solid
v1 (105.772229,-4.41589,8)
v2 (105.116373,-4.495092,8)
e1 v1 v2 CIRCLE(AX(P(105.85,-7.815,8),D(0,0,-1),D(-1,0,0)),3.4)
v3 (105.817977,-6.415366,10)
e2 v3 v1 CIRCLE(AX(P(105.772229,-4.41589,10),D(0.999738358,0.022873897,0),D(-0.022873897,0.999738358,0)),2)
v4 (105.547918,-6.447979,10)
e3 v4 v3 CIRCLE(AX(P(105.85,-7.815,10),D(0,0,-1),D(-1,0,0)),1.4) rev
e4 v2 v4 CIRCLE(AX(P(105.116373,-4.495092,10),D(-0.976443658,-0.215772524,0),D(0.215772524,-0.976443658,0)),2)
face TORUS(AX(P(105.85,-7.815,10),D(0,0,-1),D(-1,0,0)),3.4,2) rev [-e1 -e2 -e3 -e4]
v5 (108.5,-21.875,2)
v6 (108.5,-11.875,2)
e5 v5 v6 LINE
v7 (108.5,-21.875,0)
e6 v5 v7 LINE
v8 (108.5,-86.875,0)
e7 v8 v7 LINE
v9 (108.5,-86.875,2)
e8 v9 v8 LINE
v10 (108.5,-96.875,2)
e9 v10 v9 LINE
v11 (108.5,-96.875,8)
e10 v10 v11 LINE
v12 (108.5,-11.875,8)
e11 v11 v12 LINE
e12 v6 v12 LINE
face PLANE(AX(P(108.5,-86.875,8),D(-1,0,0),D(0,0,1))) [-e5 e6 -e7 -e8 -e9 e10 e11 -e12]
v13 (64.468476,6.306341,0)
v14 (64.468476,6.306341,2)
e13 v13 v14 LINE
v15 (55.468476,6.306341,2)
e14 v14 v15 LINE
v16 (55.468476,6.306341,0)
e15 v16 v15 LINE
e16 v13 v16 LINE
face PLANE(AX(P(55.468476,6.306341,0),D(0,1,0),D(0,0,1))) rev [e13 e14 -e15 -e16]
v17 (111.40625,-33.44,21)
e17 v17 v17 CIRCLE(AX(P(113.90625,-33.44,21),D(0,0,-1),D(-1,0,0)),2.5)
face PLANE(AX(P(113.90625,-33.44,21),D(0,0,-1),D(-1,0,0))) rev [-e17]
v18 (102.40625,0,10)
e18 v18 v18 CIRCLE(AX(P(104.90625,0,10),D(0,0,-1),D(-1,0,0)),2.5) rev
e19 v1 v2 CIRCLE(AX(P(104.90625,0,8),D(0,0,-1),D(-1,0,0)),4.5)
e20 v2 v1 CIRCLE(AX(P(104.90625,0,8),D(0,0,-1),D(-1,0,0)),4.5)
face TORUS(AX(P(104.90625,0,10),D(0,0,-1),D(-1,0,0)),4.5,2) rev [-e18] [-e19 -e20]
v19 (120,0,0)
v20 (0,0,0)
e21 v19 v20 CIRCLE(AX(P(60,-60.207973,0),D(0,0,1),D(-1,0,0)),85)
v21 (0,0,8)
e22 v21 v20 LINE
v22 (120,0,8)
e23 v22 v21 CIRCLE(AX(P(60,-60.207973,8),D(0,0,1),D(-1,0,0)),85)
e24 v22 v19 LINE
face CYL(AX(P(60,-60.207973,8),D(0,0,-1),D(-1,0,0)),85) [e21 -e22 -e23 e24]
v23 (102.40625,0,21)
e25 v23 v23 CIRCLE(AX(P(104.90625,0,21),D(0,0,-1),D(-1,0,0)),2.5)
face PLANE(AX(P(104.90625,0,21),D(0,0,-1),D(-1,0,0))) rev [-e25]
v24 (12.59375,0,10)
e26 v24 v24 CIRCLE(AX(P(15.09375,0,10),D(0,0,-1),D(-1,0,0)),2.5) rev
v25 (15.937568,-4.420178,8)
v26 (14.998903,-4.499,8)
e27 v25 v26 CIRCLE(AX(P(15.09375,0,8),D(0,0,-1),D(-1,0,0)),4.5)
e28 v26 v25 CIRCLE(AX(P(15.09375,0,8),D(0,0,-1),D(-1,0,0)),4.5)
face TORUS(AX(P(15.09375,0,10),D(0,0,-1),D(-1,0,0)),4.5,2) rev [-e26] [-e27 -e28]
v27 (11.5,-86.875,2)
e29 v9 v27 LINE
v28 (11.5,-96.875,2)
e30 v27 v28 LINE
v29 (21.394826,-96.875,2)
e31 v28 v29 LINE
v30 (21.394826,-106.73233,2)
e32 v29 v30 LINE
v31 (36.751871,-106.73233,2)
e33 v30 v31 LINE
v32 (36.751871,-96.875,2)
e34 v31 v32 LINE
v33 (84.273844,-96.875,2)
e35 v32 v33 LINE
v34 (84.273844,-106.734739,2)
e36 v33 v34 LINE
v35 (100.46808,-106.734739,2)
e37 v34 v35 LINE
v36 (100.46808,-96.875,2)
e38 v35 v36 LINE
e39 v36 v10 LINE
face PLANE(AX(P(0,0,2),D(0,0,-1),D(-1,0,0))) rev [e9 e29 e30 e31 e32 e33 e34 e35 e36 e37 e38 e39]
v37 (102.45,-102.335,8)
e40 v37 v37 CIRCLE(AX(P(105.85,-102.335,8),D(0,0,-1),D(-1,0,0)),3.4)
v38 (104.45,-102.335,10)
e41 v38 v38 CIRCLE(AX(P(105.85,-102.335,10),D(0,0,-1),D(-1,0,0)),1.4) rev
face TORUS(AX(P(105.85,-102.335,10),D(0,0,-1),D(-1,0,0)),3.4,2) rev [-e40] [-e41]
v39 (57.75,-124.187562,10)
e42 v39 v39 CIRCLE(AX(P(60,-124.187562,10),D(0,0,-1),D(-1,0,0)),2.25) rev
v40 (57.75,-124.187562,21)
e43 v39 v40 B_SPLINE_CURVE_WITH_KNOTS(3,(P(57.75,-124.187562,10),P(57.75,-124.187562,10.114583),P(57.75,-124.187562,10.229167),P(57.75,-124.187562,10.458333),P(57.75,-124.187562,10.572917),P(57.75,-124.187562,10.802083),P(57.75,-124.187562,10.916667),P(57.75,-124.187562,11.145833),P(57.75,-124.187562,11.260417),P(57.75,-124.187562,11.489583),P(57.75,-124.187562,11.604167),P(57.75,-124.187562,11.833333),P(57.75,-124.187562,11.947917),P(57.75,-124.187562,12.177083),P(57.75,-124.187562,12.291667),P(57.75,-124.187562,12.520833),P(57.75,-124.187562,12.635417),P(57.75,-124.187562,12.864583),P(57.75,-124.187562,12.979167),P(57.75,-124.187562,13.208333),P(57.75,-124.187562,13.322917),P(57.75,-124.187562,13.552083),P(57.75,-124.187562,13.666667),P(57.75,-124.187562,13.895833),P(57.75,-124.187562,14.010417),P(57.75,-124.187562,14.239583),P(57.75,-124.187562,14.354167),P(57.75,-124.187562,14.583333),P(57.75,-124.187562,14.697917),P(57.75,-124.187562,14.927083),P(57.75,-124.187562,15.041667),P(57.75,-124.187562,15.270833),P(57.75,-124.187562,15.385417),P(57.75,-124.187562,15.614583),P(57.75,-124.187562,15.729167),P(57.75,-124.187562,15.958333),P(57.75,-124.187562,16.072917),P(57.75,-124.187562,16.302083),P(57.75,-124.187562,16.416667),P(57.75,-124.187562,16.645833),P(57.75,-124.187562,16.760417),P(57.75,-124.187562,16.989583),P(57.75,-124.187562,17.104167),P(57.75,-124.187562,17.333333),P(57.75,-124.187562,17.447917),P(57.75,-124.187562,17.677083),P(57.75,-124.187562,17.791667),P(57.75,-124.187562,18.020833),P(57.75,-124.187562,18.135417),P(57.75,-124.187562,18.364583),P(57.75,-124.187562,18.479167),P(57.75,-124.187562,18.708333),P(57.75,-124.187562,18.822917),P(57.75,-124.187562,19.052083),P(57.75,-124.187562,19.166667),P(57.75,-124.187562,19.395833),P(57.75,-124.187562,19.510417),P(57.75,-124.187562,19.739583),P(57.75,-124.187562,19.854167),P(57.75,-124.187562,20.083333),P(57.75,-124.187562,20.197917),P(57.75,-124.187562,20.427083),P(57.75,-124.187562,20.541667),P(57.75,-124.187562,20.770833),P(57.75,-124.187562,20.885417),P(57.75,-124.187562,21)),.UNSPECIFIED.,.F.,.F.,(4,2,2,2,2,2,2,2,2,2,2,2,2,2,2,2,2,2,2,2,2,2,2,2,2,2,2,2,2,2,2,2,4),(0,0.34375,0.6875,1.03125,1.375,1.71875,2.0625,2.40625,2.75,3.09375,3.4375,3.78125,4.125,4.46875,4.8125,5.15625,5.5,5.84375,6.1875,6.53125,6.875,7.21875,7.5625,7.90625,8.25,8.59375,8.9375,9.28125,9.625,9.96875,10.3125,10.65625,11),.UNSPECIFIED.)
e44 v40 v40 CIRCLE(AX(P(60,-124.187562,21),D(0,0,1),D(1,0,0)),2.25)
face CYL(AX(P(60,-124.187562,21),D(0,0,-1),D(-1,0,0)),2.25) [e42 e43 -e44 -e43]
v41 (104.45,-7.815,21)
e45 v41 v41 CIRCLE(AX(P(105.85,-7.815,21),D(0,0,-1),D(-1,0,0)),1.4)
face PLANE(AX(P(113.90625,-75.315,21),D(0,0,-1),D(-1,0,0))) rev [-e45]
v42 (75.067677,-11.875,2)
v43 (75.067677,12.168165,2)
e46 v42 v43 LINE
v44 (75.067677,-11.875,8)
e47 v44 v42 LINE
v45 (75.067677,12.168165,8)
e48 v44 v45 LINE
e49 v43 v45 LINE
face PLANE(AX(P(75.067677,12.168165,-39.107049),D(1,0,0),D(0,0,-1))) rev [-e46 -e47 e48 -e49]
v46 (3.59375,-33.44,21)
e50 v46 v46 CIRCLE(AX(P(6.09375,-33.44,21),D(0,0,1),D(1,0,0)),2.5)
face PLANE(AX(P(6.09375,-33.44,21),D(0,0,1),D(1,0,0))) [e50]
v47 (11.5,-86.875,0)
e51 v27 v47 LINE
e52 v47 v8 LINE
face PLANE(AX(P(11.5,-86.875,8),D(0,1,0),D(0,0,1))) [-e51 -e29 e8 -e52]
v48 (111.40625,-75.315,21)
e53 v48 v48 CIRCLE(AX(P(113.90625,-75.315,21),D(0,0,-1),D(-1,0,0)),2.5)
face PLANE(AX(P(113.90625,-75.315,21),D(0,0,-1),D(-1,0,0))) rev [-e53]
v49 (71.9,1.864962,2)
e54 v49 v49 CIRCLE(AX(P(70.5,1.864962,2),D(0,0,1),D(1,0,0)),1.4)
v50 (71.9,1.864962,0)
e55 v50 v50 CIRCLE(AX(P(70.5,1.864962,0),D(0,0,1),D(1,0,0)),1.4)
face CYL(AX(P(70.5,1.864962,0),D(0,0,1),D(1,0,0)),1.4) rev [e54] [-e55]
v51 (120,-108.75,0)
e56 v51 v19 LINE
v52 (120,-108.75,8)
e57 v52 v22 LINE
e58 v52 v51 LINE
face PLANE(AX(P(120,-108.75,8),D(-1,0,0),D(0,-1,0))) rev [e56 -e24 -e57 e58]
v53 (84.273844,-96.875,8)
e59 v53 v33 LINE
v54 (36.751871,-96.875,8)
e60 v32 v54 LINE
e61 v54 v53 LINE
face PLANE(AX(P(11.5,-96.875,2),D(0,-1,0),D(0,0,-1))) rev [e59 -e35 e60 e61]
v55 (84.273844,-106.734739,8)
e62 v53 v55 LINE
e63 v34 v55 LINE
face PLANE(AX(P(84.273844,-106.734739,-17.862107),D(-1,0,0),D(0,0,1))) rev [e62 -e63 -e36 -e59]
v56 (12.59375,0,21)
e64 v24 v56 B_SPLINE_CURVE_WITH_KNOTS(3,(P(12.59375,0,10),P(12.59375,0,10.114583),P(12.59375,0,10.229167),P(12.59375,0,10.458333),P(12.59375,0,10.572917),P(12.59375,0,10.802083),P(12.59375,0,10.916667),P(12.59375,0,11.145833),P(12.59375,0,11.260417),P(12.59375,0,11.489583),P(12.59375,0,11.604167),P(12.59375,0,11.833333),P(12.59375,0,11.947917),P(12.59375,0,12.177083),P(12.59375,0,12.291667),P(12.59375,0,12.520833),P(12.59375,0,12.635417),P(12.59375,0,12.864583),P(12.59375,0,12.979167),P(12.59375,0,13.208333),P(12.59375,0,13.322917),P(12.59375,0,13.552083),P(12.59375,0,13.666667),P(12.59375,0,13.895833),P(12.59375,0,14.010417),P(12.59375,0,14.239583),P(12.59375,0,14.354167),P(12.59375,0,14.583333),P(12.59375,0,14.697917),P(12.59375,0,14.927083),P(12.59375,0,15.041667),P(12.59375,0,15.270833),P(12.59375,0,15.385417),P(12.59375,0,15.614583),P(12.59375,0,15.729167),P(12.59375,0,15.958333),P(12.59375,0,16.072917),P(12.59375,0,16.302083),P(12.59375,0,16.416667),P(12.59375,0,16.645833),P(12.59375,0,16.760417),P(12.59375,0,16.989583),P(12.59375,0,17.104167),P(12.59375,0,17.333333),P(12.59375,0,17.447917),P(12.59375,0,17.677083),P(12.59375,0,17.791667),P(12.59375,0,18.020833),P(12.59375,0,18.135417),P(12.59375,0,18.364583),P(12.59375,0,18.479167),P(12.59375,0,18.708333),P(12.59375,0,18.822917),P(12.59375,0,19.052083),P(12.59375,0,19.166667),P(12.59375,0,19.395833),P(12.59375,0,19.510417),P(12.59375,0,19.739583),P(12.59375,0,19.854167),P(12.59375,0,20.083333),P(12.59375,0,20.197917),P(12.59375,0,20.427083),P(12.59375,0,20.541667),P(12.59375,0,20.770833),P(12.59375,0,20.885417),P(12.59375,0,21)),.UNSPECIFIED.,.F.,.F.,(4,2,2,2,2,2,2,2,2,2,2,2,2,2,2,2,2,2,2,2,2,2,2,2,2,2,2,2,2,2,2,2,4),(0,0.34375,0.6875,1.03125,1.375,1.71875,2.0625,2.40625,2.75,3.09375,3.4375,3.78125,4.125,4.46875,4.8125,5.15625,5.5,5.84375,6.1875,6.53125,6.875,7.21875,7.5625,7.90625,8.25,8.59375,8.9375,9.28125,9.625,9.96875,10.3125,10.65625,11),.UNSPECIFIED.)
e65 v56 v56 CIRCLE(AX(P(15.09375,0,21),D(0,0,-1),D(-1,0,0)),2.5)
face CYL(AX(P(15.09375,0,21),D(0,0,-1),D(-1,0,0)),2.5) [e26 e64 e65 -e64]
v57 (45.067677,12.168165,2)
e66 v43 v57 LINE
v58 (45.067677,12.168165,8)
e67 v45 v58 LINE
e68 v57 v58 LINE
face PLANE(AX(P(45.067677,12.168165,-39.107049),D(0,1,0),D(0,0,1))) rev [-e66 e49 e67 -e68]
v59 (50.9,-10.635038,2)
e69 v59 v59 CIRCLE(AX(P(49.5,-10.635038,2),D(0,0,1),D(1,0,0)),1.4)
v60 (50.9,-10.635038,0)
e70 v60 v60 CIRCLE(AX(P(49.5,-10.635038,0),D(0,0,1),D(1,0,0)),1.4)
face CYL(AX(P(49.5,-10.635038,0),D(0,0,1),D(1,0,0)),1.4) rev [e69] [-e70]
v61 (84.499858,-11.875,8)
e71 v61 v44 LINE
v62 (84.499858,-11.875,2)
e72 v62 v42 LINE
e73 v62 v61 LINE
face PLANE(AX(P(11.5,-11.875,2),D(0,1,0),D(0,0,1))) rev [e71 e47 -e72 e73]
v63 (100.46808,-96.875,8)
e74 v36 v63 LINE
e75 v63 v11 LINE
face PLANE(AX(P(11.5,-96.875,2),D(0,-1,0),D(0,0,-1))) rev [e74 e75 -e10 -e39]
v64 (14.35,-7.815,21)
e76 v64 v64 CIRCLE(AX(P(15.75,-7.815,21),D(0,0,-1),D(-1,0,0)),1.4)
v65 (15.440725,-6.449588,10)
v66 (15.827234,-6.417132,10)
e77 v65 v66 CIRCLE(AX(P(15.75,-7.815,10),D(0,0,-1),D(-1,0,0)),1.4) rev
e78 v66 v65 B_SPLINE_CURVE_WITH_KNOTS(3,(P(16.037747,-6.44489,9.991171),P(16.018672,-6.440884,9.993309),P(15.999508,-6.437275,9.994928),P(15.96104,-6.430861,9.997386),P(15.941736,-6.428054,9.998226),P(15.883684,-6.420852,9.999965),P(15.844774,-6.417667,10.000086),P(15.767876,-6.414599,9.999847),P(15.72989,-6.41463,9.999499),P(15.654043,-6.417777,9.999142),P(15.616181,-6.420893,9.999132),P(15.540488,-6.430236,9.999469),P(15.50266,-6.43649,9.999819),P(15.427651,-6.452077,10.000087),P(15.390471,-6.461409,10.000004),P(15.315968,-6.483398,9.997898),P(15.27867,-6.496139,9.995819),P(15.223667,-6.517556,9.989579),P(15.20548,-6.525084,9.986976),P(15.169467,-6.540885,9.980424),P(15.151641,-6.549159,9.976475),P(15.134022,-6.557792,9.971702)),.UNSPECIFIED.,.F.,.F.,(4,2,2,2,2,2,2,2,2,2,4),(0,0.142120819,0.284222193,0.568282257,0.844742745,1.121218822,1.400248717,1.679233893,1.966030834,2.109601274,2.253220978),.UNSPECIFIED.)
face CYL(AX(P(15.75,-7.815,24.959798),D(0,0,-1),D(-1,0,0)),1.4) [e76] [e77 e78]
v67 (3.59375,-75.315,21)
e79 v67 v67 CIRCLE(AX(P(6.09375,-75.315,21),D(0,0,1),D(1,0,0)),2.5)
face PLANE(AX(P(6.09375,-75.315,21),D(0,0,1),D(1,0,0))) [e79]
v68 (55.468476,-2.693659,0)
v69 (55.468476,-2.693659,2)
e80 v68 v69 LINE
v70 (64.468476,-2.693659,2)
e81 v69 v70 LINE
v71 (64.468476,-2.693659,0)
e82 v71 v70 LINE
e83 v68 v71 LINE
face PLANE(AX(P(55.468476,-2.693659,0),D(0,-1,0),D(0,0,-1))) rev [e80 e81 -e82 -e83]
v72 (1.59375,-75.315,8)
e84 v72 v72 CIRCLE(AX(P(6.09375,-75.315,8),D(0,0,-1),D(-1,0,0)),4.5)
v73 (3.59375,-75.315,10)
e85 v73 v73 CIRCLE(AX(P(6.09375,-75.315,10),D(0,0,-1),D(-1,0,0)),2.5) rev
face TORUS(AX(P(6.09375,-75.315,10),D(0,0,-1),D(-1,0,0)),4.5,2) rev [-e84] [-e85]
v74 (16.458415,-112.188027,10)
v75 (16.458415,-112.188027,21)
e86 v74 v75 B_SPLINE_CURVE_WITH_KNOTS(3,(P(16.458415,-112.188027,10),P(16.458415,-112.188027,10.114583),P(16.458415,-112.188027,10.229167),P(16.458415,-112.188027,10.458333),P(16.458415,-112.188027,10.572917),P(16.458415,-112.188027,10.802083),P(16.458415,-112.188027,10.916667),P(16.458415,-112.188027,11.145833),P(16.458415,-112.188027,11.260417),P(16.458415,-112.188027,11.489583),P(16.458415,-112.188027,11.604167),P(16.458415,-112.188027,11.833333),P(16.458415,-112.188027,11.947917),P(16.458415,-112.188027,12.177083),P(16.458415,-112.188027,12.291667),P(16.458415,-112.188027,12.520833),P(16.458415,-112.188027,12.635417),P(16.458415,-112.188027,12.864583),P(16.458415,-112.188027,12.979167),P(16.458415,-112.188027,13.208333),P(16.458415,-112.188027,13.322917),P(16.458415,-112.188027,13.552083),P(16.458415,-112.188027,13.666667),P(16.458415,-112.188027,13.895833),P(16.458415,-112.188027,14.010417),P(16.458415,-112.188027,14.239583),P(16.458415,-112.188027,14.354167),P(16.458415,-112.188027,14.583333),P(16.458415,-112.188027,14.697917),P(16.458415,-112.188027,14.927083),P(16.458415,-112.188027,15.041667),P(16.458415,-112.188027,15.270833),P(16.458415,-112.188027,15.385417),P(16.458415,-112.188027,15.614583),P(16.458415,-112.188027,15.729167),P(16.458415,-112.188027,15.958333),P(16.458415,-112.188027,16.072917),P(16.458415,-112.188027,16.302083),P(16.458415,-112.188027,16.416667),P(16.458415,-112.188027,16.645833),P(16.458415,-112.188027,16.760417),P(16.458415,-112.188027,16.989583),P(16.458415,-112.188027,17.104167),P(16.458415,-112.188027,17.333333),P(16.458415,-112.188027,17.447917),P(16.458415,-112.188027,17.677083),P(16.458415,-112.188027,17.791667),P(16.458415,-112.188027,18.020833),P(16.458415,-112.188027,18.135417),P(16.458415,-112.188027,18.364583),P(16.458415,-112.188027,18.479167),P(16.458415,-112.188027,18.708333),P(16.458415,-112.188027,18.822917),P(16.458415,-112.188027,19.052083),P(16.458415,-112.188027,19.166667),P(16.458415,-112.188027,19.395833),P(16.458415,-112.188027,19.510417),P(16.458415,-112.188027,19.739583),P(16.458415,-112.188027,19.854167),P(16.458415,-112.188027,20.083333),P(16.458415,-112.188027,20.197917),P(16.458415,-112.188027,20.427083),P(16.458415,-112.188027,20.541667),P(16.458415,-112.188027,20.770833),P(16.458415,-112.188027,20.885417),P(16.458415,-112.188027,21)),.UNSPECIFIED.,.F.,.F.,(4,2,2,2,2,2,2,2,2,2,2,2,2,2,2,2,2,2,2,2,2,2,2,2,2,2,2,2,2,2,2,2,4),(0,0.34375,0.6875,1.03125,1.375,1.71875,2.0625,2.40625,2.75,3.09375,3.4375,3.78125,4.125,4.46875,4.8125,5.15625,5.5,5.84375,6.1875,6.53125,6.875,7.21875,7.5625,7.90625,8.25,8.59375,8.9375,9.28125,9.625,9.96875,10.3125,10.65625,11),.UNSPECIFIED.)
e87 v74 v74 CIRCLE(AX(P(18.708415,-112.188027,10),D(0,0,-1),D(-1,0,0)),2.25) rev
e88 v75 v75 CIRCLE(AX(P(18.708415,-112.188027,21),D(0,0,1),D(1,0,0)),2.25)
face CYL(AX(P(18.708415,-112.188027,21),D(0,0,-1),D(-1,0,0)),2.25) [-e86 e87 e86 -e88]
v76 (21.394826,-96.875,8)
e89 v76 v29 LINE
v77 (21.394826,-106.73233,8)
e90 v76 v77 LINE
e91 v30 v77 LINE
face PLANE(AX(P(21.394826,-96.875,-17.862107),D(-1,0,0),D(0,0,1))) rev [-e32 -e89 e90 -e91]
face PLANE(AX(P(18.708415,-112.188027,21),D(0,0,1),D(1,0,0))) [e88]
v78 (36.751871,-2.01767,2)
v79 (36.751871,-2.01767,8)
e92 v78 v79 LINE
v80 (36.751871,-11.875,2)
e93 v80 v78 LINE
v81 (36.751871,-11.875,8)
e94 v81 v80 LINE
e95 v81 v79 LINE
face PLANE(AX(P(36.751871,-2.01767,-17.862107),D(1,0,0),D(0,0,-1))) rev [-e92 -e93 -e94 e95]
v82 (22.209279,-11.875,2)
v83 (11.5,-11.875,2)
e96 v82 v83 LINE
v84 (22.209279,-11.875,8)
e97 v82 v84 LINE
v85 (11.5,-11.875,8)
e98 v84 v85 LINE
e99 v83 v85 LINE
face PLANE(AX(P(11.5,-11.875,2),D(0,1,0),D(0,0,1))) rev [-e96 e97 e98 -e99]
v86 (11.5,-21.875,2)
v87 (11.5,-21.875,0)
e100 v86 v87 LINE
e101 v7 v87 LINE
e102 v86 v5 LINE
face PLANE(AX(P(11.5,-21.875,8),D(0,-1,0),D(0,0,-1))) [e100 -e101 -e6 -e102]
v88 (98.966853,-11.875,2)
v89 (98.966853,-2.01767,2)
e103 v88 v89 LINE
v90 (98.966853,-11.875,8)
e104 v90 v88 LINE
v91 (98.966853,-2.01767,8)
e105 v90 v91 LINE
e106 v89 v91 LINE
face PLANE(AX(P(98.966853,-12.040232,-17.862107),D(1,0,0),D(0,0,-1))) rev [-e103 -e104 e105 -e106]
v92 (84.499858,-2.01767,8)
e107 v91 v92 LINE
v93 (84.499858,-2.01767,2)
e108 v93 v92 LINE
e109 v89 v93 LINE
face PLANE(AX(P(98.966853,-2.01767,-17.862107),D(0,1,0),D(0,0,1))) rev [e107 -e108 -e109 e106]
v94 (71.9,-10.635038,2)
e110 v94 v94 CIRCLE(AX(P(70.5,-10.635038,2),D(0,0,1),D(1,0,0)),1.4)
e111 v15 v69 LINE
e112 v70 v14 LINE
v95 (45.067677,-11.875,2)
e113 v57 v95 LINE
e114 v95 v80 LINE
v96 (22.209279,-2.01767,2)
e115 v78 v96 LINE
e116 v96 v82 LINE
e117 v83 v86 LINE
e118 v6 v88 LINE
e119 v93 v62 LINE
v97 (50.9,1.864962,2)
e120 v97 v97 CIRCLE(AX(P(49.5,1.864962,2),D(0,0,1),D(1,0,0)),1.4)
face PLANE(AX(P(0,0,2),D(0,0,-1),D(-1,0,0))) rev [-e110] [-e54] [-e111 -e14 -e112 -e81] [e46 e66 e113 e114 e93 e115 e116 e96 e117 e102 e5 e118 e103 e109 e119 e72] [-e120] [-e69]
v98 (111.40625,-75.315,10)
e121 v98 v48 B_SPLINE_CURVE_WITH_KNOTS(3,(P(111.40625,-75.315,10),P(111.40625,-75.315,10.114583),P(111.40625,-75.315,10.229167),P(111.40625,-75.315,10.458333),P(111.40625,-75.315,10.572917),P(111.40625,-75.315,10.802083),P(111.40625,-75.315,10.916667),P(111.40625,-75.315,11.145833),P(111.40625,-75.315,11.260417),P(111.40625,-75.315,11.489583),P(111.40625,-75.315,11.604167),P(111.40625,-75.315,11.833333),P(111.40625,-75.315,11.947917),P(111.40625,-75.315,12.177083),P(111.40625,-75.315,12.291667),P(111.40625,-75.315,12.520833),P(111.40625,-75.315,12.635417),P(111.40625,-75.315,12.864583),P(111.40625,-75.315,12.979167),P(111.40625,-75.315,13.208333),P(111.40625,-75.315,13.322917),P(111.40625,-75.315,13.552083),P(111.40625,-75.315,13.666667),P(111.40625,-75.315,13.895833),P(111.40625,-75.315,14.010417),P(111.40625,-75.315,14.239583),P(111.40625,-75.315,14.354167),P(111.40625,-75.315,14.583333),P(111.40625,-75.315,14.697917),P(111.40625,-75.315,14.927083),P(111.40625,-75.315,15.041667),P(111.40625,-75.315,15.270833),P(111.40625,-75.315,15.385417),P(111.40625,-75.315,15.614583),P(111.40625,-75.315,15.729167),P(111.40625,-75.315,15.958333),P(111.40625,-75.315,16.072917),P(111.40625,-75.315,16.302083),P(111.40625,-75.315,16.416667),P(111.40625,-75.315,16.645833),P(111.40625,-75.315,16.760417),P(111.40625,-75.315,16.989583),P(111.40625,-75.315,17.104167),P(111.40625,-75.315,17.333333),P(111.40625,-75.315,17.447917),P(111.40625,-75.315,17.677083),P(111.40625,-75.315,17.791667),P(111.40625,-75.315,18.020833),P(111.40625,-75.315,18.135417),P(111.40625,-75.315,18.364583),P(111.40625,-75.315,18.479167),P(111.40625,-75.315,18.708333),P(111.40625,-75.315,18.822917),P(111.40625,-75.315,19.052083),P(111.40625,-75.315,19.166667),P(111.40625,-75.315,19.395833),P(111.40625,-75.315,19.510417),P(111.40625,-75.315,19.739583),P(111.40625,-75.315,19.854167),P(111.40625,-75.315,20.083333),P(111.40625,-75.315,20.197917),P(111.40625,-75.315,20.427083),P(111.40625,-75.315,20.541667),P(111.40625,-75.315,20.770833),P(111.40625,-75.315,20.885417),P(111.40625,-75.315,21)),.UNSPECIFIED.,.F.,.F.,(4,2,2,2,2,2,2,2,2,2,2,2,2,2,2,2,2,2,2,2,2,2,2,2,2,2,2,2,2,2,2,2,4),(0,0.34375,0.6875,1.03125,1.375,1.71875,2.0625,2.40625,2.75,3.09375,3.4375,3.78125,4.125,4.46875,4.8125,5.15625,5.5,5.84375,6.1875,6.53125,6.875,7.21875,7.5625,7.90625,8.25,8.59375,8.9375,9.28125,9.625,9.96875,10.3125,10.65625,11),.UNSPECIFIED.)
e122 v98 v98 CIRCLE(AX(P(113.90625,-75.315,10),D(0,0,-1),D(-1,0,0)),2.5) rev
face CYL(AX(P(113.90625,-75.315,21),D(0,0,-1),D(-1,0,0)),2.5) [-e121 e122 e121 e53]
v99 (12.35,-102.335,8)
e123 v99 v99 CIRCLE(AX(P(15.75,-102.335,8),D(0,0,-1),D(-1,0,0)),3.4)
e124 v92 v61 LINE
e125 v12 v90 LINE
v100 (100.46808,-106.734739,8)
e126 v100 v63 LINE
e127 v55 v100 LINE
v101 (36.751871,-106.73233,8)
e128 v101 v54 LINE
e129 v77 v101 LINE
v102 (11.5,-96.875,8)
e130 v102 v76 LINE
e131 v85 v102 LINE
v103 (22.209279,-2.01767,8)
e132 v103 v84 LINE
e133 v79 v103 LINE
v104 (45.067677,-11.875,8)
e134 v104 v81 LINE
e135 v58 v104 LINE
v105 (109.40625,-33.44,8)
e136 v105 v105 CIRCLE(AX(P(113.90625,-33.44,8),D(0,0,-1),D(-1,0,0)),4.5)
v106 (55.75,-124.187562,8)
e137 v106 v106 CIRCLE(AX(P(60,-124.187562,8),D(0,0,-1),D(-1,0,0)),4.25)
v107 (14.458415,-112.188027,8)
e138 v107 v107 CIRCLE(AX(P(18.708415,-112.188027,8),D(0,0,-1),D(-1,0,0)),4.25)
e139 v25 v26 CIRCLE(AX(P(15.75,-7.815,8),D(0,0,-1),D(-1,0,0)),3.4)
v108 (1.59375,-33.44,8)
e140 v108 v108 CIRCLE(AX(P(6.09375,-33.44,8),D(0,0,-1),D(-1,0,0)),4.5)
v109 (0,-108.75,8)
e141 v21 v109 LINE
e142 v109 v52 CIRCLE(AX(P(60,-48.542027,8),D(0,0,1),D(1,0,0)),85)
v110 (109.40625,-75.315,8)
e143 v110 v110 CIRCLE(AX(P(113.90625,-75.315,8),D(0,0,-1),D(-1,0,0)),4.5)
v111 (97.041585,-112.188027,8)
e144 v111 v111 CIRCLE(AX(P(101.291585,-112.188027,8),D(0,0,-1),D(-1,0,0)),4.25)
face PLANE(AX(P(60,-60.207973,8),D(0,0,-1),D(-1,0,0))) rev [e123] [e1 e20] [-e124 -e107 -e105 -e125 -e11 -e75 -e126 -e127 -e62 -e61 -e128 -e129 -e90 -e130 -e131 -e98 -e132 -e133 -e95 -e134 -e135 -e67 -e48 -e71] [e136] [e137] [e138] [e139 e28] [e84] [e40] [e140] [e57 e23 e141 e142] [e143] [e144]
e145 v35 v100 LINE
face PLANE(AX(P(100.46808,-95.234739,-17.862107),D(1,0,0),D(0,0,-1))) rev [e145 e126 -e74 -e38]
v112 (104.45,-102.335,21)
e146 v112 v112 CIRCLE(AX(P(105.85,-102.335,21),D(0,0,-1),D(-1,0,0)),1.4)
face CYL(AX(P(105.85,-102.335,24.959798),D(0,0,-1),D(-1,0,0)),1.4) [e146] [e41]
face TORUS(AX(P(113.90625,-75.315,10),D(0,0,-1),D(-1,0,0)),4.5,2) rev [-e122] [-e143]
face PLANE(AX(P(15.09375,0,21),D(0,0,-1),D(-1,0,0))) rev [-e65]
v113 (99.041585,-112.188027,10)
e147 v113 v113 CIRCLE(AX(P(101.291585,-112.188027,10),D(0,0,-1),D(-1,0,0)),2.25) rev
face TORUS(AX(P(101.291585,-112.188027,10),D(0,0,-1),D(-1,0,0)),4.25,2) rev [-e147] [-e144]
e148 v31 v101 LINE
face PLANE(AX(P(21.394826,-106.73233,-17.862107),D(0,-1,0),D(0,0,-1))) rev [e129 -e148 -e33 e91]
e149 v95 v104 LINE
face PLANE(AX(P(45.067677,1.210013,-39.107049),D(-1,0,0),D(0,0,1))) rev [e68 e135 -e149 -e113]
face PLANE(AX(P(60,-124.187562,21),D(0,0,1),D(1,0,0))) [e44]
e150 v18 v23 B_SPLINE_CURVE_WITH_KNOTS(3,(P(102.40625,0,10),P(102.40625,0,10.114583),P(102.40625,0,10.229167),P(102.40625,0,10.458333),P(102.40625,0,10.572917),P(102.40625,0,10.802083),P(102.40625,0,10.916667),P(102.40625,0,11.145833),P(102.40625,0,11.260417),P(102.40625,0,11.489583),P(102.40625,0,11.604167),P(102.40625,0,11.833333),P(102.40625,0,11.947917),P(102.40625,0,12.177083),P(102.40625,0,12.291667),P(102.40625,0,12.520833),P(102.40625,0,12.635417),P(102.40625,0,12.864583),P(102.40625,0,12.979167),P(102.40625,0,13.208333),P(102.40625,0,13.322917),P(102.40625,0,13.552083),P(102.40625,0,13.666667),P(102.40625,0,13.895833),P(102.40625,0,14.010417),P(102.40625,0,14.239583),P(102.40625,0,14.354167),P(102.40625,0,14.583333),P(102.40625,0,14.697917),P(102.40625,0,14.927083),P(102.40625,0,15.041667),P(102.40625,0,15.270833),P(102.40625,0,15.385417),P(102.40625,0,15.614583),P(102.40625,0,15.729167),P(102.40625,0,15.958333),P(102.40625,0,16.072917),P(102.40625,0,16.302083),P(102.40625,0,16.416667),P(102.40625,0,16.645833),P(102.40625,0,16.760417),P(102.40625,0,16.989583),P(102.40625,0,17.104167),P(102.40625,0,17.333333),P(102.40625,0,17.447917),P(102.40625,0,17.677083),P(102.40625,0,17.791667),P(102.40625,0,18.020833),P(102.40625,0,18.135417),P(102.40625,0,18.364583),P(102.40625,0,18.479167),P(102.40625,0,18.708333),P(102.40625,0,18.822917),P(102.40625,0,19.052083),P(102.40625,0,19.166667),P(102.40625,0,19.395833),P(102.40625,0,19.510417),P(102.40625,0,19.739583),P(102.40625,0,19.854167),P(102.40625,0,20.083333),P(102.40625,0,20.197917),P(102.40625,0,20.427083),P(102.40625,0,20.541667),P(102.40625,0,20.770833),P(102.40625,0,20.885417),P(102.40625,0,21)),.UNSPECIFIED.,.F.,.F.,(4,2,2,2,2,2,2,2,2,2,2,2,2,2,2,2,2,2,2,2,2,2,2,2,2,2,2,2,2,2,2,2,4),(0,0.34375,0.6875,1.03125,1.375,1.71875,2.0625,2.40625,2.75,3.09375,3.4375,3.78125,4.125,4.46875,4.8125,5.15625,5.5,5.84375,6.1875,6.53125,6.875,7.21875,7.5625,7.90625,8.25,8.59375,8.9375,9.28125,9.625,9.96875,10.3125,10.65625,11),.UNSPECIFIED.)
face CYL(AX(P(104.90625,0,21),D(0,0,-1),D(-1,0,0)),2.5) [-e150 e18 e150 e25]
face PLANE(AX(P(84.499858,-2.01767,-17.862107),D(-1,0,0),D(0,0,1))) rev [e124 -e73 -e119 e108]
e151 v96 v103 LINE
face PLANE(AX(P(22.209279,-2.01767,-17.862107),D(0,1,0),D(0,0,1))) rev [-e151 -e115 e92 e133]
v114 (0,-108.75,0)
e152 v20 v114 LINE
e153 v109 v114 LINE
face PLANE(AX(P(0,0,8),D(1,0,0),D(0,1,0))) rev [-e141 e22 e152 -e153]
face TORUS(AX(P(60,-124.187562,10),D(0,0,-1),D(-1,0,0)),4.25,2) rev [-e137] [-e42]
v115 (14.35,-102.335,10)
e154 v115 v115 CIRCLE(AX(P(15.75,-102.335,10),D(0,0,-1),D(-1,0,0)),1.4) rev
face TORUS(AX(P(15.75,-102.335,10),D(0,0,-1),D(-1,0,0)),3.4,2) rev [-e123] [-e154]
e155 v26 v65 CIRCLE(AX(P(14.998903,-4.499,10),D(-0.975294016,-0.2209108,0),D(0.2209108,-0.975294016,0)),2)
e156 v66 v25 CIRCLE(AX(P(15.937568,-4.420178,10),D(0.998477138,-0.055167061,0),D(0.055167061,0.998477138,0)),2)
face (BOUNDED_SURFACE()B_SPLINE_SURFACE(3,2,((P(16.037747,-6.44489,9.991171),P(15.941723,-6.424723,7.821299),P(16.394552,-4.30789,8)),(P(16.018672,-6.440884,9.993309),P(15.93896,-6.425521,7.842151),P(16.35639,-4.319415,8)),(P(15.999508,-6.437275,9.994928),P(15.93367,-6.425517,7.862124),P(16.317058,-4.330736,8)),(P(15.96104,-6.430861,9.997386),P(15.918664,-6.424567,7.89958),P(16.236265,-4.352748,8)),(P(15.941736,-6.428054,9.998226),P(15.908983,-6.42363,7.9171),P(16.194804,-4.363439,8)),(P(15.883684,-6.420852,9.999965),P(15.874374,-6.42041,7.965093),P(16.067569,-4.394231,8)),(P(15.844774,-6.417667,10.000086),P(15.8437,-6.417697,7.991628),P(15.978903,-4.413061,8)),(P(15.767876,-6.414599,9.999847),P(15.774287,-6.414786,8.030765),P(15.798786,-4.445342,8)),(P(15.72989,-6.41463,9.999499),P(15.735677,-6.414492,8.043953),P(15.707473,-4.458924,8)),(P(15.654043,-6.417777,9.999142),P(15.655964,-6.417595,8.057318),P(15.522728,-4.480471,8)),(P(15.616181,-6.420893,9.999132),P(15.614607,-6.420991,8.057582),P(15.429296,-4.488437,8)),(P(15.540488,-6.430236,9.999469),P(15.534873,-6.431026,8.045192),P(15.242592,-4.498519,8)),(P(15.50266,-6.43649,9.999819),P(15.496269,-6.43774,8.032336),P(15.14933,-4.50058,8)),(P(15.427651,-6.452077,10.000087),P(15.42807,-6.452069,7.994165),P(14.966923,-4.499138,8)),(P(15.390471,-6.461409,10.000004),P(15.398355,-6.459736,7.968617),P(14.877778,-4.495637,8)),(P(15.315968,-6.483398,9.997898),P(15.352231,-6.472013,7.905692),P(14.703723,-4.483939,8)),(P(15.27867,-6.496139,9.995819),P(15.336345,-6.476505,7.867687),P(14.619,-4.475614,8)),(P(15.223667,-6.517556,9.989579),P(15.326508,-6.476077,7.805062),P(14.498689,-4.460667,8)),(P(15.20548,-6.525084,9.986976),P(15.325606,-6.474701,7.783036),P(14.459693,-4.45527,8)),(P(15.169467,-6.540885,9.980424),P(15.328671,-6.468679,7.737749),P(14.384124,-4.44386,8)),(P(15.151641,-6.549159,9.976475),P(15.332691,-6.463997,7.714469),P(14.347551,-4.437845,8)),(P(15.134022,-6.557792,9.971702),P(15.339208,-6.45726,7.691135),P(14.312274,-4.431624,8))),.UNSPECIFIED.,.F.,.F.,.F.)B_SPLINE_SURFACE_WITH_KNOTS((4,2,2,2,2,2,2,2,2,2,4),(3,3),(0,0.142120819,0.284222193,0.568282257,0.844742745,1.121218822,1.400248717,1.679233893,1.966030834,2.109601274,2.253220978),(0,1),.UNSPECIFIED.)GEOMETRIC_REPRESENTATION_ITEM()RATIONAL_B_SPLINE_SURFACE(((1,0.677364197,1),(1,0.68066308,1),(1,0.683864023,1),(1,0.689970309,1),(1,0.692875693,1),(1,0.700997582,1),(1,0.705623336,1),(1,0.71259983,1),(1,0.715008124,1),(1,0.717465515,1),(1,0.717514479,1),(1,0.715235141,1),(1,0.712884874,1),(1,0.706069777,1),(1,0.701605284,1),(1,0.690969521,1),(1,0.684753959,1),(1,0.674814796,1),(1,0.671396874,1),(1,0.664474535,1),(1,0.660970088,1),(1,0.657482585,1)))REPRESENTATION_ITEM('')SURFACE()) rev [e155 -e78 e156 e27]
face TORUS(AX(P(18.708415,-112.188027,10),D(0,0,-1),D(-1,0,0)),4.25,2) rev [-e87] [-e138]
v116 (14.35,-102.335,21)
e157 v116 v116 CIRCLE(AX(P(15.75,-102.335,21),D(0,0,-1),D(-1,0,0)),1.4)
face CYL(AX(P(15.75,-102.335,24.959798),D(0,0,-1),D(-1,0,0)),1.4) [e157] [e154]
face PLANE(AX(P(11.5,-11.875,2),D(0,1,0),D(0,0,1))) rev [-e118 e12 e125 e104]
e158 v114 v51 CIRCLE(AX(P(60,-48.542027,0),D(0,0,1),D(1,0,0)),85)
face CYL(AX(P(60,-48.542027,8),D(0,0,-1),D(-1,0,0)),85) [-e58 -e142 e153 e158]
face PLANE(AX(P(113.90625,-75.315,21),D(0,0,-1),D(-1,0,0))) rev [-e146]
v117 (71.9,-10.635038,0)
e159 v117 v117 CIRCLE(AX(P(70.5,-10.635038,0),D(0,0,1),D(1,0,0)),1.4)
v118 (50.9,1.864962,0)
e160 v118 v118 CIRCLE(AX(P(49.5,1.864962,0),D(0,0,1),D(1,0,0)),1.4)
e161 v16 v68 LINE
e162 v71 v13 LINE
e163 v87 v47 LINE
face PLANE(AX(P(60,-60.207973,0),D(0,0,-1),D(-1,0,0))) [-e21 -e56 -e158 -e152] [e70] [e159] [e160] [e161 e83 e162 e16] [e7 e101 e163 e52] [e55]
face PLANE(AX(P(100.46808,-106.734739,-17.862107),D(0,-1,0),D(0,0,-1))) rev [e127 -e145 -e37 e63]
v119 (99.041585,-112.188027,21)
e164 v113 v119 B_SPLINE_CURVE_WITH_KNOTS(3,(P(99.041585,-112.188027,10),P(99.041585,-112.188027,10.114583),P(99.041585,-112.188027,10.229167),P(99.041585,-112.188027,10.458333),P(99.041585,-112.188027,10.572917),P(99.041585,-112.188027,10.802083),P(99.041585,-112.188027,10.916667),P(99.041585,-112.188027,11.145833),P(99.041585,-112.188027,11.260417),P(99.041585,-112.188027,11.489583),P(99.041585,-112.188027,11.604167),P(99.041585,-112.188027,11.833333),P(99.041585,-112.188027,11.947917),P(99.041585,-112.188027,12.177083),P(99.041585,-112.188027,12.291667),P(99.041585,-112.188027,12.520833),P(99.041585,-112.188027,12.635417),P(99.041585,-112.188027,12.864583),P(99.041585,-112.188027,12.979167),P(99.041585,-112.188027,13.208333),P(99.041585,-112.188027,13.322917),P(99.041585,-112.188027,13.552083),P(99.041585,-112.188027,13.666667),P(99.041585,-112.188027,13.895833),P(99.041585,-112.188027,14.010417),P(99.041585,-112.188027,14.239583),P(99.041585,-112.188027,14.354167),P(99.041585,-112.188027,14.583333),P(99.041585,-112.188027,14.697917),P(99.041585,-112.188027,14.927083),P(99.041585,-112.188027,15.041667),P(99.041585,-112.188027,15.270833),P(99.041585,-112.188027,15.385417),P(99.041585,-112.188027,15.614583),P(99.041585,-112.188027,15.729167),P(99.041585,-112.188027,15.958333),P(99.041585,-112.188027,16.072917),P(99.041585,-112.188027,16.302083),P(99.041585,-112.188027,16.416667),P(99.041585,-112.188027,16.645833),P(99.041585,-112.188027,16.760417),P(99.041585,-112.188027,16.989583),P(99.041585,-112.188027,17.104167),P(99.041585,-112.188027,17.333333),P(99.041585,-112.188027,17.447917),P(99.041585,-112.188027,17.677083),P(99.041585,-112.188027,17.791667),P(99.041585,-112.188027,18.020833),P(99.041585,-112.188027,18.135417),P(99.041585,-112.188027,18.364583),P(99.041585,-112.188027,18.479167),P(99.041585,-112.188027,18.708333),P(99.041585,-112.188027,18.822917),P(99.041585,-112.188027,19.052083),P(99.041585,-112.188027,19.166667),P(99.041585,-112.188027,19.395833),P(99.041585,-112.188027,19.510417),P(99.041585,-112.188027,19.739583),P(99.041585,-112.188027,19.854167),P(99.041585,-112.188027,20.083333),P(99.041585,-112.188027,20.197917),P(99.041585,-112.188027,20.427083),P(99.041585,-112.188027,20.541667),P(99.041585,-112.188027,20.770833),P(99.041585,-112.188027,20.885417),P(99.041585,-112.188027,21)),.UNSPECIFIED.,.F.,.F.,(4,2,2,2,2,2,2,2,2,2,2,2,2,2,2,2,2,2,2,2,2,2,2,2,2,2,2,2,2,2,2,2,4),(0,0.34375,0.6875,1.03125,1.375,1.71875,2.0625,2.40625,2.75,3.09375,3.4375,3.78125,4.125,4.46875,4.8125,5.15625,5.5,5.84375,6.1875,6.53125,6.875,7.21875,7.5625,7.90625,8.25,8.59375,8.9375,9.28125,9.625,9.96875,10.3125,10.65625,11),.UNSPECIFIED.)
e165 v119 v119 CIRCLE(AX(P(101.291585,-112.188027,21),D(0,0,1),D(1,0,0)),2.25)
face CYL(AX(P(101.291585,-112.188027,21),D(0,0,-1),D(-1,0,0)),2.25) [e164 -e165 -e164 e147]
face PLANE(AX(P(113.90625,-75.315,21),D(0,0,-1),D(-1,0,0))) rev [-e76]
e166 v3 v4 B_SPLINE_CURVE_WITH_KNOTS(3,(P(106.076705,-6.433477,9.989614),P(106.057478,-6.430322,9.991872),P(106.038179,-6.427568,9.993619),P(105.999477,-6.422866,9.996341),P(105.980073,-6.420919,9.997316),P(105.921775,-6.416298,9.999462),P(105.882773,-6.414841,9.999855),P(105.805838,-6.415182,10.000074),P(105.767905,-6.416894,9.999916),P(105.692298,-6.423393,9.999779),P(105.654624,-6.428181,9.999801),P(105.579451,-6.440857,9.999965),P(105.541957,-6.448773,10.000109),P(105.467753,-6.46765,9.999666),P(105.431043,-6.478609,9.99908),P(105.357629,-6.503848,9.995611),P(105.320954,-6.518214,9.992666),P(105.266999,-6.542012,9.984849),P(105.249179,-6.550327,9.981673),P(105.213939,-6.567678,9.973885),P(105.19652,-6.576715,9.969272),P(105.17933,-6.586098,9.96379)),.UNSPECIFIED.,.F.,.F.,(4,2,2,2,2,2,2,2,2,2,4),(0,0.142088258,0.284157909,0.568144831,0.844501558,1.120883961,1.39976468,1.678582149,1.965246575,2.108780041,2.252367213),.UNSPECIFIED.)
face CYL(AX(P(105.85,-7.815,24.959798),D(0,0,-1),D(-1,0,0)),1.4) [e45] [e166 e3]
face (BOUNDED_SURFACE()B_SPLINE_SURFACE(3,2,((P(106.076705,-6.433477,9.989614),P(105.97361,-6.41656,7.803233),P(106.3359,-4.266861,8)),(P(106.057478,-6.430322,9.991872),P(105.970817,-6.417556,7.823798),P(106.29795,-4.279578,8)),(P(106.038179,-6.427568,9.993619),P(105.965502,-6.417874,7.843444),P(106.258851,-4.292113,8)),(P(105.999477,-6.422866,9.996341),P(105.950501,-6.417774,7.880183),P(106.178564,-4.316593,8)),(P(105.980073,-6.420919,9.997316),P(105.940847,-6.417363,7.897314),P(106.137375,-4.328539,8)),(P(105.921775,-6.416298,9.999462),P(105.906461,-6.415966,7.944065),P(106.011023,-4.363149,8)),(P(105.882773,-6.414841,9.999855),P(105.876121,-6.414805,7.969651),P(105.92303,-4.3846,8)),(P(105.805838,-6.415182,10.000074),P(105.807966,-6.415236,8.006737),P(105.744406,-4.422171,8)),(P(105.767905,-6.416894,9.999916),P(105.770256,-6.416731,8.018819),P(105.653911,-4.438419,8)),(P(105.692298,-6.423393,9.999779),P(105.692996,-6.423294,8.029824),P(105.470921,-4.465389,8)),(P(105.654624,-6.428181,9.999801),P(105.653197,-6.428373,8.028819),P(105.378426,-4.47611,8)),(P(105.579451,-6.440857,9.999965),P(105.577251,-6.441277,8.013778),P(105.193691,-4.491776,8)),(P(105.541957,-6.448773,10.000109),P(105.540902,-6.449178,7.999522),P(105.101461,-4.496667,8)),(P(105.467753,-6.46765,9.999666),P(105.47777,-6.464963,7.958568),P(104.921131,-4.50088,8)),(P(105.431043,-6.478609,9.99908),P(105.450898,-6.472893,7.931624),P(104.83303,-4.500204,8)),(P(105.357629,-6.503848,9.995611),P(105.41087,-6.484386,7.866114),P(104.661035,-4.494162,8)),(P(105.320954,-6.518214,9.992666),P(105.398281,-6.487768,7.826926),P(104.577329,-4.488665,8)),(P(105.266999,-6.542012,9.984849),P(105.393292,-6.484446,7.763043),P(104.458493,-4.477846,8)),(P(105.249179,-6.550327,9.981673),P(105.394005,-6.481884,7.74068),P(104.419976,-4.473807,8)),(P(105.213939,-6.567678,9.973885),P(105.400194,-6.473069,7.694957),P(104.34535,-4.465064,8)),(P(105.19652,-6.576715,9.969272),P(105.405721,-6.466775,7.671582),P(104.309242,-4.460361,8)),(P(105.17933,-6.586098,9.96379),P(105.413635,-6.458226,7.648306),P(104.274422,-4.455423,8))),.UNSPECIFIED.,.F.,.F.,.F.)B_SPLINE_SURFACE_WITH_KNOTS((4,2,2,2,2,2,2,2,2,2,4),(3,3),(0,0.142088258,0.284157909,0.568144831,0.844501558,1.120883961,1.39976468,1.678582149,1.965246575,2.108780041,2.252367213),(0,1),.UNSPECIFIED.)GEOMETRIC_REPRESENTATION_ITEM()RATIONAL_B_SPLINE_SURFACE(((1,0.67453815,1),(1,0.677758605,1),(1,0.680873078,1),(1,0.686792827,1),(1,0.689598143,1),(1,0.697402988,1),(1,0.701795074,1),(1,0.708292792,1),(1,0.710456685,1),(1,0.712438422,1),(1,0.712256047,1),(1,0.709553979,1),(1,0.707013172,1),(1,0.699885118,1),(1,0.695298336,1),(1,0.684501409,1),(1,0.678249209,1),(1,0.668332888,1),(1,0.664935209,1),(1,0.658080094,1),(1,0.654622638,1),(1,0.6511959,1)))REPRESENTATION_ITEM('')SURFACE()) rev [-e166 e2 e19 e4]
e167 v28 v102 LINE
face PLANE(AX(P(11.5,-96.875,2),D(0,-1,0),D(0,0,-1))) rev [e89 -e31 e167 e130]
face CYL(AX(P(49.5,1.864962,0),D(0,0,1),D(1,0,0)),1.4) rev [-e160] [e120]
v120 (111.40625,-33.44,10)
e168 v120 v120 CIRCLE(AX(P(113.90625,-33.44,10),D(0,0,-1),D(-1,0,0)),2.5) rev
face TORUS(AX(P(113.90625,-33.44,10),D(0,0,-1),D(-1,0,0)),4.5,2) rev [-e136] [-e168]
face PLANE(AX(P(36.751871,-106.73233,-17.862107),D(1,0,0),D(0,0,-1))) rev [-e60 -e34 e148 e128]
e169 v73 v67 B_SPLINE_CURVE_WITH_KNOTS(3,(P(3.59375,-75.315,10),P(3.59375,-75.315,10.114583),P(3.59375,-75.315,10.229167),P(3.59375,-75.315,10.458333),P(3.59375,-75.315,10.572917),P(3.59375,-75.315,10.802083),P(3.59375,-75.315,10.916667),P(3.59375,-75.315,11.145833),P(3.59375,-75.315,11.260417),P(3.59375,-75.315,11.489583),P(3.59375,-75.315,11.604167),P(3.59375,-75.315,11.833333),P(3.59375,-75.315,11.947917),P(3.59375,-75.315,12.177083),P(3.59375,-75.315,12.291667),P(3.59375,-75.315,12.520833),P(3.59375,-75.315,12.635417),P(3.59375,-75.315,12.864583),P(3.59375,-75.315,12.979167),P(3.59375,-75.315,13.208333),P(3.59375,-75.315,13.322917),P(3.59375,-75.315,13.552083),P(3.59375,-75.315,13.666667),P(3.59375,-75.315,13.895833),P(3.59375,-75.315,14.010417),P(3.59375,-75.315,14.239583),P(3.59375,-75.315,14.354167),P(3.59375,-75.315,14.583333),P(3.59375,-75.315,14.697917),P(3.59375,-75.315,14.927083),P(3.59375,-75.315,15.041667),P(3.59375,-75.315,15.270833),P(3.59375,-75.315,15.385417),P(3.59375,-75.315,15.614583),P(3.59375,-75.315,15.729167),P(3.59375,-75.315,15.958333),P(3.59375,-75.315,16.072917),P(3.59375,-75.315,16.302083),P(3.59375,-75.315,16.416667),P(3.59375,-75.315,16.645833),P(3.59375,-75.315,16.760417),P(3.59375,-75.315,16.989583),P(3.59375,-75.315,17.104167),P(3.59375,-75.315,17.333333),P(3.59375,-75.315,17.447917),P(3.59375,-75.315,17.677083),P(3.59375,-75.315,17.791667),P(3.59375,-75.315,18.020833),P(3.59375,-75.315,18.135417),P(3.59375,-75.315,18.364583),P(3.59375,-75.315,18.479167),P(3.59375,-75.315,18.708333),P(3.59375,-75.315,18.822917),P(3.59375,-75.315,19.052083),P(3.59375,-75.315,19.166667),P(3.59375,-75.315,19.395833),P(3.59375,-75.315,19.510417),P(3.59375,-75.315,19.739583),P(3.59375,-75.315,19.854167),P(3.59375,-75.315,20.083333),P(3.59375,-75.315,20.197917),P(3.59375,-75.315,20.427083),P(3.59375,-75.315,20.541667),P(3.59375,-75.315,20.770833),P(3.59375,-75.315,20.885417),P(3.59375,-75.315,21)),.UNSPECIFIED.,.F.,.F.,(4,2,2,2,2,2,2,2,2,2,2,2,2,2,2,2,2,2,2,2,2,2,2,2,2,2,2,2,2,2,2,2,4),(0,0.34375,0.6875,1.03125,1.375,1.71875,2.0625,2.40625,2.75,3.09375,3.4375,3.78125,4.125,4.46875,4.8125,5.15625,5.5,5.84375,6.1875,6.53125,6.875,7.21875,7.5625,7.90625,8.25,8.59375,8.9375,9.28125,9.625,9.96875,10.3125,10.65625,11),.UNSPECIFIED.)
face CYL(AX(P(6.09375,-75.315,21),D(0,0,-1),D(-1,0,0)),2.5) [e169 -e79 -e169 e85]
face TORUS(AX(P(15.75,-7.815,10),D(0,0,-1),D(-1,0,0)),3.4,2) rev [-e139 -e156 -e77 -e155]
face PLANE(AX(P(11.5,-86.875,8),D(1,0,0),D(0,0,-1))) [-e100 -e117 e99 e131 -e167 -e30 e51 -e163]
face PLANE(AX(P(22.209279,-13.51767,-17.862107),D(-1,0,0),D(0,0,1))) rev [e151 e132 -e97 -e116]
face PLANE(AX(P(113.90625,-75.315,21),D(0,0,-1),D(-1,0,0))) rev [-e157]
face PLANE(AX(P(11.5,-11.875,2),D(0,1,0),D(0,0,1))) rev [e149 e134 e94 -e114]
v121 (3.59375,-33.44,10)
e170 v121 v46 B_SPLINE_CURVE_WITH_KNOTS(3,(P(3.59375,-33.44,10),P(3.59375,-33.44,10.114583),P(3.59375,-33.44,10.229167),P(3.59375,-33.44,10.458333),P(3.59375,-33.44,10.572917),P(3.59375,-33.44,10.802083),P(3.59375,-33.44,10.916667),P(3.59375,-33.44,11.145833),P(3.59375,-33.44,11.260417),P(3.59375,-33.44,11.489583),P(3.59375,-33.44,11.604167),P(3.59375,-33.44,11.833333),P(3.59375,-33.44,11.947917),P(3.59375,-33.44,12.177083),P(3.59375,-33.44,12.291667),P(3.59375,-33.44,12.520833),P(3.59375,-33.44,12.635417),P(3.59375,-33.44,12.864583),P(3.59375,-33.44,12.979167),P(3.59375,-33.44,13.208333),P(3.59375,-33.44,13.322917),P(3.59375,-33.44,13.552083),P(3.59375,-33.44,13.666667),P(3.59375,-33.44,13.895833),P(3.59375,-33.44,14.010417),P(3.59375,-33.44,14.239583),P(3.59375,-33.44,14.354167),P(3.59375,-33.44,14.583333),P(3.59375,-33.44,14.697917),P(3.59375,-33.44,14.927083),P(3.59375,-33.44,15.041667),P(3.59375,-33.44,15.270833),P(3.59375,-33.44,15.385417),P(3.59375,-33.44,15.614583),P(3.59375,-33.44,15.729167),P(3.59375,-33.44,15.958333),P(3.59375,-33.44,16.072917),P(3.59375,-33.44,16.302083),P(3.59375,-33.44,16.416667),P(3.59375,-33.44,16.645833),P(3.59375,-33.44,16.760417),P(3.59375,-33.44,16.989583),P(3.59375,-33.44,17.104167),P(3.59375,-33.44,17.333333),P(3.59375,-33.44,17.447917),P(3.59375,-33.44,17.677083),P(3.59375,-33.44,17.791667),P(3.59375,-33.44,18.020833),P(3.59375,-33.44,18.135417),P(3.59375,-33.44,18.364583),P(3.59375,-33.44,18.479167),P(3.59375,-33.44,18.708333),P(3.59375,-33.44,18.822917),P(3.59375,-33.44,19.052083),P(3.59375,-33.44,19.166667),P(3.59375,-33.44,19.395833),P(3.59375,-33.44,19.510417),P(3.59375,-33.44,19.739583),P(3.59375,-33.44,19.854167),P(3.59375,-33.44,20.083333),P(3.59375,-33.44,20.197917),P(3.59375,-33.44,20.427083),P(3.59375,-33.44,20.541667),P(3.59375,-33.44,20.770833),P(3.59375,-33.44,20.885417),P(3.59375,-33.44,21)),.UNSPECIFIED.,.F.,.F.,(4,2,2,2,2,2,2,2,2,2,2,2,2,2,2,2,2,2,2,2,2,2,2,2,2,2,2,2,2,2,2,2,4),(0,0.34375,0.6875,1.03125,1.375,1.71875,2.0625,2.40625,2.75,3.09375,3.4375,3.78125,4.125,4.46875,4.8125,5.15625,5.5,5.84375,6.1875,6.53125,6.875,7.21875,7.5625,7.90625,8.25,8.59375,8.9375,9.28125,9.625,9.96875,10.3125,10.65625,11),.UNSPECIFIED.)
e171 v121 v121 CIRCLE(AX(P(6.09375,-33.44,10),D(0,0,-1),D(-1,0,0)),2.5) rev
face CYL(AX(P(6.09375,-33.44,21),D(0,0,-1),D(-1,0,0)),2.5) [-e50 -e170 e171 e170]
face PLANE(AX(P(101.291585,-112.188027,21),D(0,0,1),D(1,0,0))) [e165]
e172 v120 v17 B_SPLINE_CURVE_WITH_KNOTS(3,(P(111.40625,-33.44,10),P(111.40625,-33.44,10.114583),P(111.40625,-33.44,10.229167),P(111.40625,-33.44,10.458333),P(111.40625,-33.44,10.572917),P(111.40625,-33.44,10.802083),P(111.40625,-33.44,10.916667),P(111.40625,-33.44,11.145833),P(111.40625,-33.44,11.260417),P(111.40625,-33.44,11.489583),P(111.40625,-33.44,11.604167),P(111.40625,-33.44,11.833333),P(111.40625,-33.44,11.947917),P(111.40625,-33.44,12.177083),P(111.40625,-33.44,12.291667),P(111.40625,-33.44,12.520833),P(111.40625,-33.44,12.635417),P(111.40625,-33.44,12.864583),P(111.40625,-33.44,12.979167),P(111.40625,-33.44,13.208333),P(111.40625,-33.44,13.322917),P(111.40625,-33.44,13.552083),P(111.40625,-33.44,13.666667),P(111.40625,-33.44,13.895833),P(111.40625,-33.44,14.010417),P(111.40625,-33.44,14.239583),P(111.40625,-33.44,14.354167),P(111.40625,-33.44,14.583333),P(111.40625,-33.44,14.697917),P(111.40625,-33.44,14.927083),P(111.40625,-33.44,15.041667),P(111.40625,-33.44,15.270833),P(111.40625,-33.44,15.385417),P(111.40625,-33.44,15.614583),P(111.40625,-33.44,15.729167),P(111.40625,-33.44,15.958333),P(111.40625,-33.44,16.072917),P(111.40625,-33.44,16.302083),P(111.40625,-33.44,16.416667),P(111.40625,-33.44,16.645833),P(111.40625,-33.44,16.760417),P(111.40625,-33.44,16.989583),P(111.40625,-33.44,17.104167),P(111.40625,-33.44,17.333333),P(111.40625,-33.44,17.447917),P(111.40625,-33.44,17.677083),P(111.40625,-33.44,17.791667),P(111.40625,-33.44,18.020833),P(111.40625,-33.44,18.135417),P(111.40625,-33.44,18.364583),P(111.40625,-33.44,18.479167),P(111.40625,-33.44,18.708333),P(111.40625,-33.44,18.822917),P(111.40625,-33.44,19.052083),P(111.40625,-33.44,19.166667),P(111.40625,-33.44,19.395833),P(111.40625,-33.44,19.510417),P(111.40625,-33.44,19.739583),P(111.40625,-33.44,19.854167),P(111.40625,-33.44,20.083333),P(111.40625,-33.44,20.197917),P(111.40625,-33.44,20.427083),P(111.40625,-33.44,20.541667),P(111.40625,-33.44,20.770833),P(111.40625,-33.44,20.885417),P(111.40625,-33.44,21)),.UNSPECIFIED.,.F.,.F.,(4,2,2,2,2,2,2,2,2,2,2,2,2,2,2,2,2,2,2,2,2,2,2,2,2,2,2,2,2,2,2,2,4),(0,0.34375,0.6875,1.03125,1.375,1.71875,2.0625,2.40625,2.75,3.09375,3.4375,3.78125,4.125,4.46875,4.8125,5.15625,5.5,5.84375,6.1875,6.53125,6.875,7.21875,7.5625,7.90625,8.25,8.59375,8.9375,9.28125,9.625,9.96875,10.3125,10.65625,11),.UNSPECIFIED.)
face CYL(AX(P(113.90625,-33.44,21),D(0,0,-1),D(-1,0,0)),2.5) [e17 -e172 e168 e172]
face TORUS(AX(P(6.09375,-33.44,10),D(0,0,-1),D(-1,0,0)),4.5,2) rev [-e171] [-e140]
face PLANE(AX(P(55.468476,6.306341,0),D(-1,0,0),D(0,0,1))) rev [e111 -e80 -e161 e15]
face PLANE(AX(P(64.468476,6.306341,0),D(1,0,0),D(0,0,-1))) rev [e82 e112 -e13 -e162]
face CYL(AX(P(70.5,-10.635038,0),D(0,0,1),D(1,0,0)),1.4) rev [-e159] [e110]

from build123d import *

# Parameters (mm, degrees)
ESBO_O1_W                = 97
ESBO_O1_H                = 65
RESSALTO_EXTRUS_O1_DEPTH = 8
ESBO_O2_W                = 97
ESBO_O2_H                = 85
CORTE_EXTRUS_O1_DEPTH    = 6
ESBO_O3_R                = 2.25
ESBO_O3_R_2              = 2.5
RESSALTO_EXTRUS_O2_DEPTH = 13
FILETE1_R                = 2
CORTE_EXTRUS_O3_DEPTH    = 5
ESBO_O6_R                = 1.4
RESSALTO_EXTRUS_O3_DEPTH = 13
FILETE2_R                = 2
CORTE_EXTRUS_O5_DEPTH    = 6
ESBO_O9_R                = 1.4
ESBO_O9_W                = 9
ESBO_O9_H                = 9
CORTE_EXTRUS_O6_DEPTH    = 181.539394603
CORTE_EXTRUS_O7_DEPTH    = 6


with BuildPart() as part:
    # Esboço1 → Ressalto-extrusão1 (new body)
    with BuildSketch(Plane.XY):
        with BuildLine():
            Line((0, 0), (0, -108.75))
            ThreePointArc((0, -108.75), (60, -133.542027106), (120, -108.75))
            Line((120, -108.75), (120, 0))
            ThreePointArc((120, 0), (60, 24.792027106), (0, 0))
        make_face()
        with Locations((60, -54.375)):
            Rectangle(ESBO_O1_W, ESBO_O1_H, mode=Mode.SUBTRACT)
    extrude(amount=RESSALTO_EXTRUS_O1_DEPTH)

    # Esboço2 → Corte-extrusão1 (cut)
    with BuildSketch(Plane.XY.offset(8)):
        with Locations((60, -54.375)):
            Rectangle(ESBO_O2_W, ESBO_O2_H)
    extrude(amount=-CORTE_EXTRUS_O1_DEPTH, mode=Mode.SUBTRACT)

    # Esboço3 → Ressalto-extrusão2 (add)
    with BuildSketch(Plane.XY.offset(8)):
        with Locations(Location((60, -124.187562439, 0), (0, 0, 180))):
            Circle(ESBO_O3_R)
        with Locations(Location((18.70841508, -112.188026974, 0), (0, 0, 180))):
            Circle(ESBO_O3_R)
        with Locations(Location((101.29158492, -112.188026974, 0), (0, 0, 180))):
            Circle(ESBO_O3_R)
        with Locations(Location((104.90625, 0, 0), (0, 0, 180))):
            Circle(ESBO_O3_R_2)
        with Locations(Location((15.09375, 0, 0), (0, 0, 180))):
            Circle(ESBO_O3_R_2)
        with Locations(Location((6.09375, -75.315, 0), (0, 0, 180))):
            Circle(ESBO_O3_R_2)
        with Locations(Location((6.09375, -33.44, 0), (0, 0, 180))):
            Circle(ESBO_O3_R_2)
        with Locations(Location((113.90625, -75.315, 0), (0, 0, 180))):
            Circle(ESBO_O3_R_2)
        with Locations(Location((113.90625, -33.44, 0), (0, 0, 180))):
            Circle(ESBO_O3_R_2)
    extrude(amount=RESSALTO_EXTRUS_O2_DEPTH)

    # Filete1
    filete1_edges = [part.edges().sort_by_distance(p)[0] for p in [
        (8.59375, -75.315, 8),
        (20.95841508, -112.188026974, 8),
        (62.25, -124.187562439, 8),
        (103.54158492, -112.188026974, 8),
        (116.40625, -75.315, 8),
        (116.40625, -33.44, 8),
        (107.40625, 0, 8),
        (17.59375, 0, 8),
        (8.59375, -33.44, 8),
    ]]
    fillet(filete1_edges, radius=FILETE1_R)

    # Esboço5 → Corte-extrusão3 (cut)
    with BuildSketch(Plane.XY.offset(8)):
        Polygon((47.059331638, -11.875), (47.059331638, 1.210012927), (73.076022221, 1.210012927), (73.076022221, -25.383617561), (47.059331638, -25.383617561), align=None)
    extrude(amount=-CORTE_EXTRUS_O3_DEPTH, mode=Mode.SUBTRACT)

    # Esboço6 → Ressalto-extrusão3 (add)
    with BuildSketch(Plane.XY.offset(8)):
        with Locations(Location((15.75, -7.815, 0), (0, 0, 180))):
            Circle(ESBO_O6_R)
        with Locations(Location((105.85, -102.335, 0), (0, 0, 180))):
            Circle(ESBO_O6_R)
        with Locations(Location((15.75, -102.335, 0), (0, 0, 180))):
            Circle(ESBO_O6_R)
        with Locations(Location((105.85, -7.815, 0), (0, 0, 180))):
            Circle(ESBO_O6_R)
    extrude(amount=RESSALTO_EXTRUS_O3_DEPTH)

    # Filete2
    # the kernel refuses this fillet: 2 mm, written as the material it adds along each edge
    with BuildSketch(Plane(origin=(15.75, -7.815, 8), x_dir=(-1, 0, 0), z_dir=(0, 1, 0))) as filete2_piece_1:
        with BuildLine():
            CenterArc((1.4 + FILETE2_R, FILETE2_R), FILETE2_R, 180, 90)
            Line((1.4, FILETE2_R), (1.4, 0))
            Line((1.4, 0), (1.4 + FILETE2_R, 0))
        make_face()
    revolve(axis=Axis((15.75, -7.815, 8), (0, 0, 1)))
    with BuildSketch(Plane(origin=(105.85, -102.335, 8), x_dir=(-1, 0, 0), z_dir=(0, 1, 0))) as filete2_piece_2:
        with BuildLine():
            CenterArc((1.4 + FILETE2_R, FILETE2_R), FILETE2_R, 180, 90)
            Line((1.4, FILETE2_R), (1.4, 0))
            Line((1.4, 0), (1.4 + FILETE2_R, 0))
        make_face()
    revolve(axis=Axis((105.85, -102.335, 8), (0, 0, 1)))
    with BuildSketch(Plane(origin=(15.75, -102.335, 8), x_dir=(-1, 0, 0), z_dir=(0, 1, 0))) as filete2_piece_3:
        with BuildLine():
            CenterArc((1.4 + FILETE2_R, FILETE2_R), FILETE2_R, 180, 90)
            Line((1.4, FILETE2_R), (1.4, 0))
            Line((1.4, 0), (1.4 + FILETE2_R, 0))
        make_face()
    revolve(axis=Axis((15.75, -102.335, 8), (0, 0, 1)))
    with BuildSketch(Plane(origin=(105.85, -7.815, 8), x_dir=(-1, 0, 0), z_dir=(0, 1, 0))) as filete2_piece_4:
        with BuildLine():
            CenterArc((1.4 + FILETE2_R, FILETE2_R), FILETE2_R, 180, 90)
            Line((1.4, FILETE2_R), (1.4, 0))
            Line((1.4, 0), (1.4 + FILETE2_R, 0))
        make_face()
    revolve(axis=Axis((105.85, -7.815, 8), (0, 0, 1)))

    # Esboço8 → Corte-extrusão5 (cut)
    with BuildSketch(Plane.XY.offset(8)):
        Polygon((45.067676929, 1.210012927), (45.067676929, 12.168164606), (75.067676929, 12.168164606), (75.067676929, -15.935028745), (45.067676929, -15.935028745), align=None)
    extrude(amount=-CORTE_EXTRUS_O5_DEPTH, mode=Mode.SUBTRACT)

    # Esboço9 → Corte-extrusão6 (cut, through all)
    with BuildSketch(Plane.XY.offset(2)):
        with Locations((49.5, -10.635038447)):
            Circle(ESBO_O9_R)
        with Locations((49.5, 1.864961553)):
            Circle(ESBO_O9_R)
        with Locations((70.5, 1.864961553)):
            Circle(ESBO_O9_R)
        with Locations((70.5, -10.635038447)):
            Circle(ESBO_O9_R)
        with Locations((59.968476265, 1.806340881)):
            Rectangle(ESBO_O9_W, ESBO_O9_H)
    extrude(amount=-CORTE_EXTRUS_O6_DEPTH, mode=Mode.SUBTRACT)

    # Esboço10 → Corte-extrusão7 (cut)
    with BuildSketch(Plane.XY.offset(8)):
        Polygon((21.394826421, -96.875), (21.394826421, -106.73233001), (36.751870923, -106.73233001), (36.751870923, -95.23233001), (21.394826421, -95.23233001), align=None)
        Polygon((100.468080416, -95.234738757), (100.468080416, -96.875), (100.468080416, -106.734738757), (84.273843611, -106.734738757), (84.273843611, -95.234738757), align=None)
        Polygon((98.96685342, -12.040231783), (98.96685342, -2.01766999), (84.499857757, -2.01766999), (84.499857757, -13.51766999), (98.96685342, -13.51766999), align=None)
        Polygon((22.209278655, -13.51766999), (22.209278655, -11.875), (22.209278655, -2.01766999), (36.751870923, -2.01766999), (36.751870923, -13.51766999), align=None)
    extrude(amount=-CORTE_EXTRUS_O7_DEPTH, mode=Mode.SUBTRACT)


solid = part.part
